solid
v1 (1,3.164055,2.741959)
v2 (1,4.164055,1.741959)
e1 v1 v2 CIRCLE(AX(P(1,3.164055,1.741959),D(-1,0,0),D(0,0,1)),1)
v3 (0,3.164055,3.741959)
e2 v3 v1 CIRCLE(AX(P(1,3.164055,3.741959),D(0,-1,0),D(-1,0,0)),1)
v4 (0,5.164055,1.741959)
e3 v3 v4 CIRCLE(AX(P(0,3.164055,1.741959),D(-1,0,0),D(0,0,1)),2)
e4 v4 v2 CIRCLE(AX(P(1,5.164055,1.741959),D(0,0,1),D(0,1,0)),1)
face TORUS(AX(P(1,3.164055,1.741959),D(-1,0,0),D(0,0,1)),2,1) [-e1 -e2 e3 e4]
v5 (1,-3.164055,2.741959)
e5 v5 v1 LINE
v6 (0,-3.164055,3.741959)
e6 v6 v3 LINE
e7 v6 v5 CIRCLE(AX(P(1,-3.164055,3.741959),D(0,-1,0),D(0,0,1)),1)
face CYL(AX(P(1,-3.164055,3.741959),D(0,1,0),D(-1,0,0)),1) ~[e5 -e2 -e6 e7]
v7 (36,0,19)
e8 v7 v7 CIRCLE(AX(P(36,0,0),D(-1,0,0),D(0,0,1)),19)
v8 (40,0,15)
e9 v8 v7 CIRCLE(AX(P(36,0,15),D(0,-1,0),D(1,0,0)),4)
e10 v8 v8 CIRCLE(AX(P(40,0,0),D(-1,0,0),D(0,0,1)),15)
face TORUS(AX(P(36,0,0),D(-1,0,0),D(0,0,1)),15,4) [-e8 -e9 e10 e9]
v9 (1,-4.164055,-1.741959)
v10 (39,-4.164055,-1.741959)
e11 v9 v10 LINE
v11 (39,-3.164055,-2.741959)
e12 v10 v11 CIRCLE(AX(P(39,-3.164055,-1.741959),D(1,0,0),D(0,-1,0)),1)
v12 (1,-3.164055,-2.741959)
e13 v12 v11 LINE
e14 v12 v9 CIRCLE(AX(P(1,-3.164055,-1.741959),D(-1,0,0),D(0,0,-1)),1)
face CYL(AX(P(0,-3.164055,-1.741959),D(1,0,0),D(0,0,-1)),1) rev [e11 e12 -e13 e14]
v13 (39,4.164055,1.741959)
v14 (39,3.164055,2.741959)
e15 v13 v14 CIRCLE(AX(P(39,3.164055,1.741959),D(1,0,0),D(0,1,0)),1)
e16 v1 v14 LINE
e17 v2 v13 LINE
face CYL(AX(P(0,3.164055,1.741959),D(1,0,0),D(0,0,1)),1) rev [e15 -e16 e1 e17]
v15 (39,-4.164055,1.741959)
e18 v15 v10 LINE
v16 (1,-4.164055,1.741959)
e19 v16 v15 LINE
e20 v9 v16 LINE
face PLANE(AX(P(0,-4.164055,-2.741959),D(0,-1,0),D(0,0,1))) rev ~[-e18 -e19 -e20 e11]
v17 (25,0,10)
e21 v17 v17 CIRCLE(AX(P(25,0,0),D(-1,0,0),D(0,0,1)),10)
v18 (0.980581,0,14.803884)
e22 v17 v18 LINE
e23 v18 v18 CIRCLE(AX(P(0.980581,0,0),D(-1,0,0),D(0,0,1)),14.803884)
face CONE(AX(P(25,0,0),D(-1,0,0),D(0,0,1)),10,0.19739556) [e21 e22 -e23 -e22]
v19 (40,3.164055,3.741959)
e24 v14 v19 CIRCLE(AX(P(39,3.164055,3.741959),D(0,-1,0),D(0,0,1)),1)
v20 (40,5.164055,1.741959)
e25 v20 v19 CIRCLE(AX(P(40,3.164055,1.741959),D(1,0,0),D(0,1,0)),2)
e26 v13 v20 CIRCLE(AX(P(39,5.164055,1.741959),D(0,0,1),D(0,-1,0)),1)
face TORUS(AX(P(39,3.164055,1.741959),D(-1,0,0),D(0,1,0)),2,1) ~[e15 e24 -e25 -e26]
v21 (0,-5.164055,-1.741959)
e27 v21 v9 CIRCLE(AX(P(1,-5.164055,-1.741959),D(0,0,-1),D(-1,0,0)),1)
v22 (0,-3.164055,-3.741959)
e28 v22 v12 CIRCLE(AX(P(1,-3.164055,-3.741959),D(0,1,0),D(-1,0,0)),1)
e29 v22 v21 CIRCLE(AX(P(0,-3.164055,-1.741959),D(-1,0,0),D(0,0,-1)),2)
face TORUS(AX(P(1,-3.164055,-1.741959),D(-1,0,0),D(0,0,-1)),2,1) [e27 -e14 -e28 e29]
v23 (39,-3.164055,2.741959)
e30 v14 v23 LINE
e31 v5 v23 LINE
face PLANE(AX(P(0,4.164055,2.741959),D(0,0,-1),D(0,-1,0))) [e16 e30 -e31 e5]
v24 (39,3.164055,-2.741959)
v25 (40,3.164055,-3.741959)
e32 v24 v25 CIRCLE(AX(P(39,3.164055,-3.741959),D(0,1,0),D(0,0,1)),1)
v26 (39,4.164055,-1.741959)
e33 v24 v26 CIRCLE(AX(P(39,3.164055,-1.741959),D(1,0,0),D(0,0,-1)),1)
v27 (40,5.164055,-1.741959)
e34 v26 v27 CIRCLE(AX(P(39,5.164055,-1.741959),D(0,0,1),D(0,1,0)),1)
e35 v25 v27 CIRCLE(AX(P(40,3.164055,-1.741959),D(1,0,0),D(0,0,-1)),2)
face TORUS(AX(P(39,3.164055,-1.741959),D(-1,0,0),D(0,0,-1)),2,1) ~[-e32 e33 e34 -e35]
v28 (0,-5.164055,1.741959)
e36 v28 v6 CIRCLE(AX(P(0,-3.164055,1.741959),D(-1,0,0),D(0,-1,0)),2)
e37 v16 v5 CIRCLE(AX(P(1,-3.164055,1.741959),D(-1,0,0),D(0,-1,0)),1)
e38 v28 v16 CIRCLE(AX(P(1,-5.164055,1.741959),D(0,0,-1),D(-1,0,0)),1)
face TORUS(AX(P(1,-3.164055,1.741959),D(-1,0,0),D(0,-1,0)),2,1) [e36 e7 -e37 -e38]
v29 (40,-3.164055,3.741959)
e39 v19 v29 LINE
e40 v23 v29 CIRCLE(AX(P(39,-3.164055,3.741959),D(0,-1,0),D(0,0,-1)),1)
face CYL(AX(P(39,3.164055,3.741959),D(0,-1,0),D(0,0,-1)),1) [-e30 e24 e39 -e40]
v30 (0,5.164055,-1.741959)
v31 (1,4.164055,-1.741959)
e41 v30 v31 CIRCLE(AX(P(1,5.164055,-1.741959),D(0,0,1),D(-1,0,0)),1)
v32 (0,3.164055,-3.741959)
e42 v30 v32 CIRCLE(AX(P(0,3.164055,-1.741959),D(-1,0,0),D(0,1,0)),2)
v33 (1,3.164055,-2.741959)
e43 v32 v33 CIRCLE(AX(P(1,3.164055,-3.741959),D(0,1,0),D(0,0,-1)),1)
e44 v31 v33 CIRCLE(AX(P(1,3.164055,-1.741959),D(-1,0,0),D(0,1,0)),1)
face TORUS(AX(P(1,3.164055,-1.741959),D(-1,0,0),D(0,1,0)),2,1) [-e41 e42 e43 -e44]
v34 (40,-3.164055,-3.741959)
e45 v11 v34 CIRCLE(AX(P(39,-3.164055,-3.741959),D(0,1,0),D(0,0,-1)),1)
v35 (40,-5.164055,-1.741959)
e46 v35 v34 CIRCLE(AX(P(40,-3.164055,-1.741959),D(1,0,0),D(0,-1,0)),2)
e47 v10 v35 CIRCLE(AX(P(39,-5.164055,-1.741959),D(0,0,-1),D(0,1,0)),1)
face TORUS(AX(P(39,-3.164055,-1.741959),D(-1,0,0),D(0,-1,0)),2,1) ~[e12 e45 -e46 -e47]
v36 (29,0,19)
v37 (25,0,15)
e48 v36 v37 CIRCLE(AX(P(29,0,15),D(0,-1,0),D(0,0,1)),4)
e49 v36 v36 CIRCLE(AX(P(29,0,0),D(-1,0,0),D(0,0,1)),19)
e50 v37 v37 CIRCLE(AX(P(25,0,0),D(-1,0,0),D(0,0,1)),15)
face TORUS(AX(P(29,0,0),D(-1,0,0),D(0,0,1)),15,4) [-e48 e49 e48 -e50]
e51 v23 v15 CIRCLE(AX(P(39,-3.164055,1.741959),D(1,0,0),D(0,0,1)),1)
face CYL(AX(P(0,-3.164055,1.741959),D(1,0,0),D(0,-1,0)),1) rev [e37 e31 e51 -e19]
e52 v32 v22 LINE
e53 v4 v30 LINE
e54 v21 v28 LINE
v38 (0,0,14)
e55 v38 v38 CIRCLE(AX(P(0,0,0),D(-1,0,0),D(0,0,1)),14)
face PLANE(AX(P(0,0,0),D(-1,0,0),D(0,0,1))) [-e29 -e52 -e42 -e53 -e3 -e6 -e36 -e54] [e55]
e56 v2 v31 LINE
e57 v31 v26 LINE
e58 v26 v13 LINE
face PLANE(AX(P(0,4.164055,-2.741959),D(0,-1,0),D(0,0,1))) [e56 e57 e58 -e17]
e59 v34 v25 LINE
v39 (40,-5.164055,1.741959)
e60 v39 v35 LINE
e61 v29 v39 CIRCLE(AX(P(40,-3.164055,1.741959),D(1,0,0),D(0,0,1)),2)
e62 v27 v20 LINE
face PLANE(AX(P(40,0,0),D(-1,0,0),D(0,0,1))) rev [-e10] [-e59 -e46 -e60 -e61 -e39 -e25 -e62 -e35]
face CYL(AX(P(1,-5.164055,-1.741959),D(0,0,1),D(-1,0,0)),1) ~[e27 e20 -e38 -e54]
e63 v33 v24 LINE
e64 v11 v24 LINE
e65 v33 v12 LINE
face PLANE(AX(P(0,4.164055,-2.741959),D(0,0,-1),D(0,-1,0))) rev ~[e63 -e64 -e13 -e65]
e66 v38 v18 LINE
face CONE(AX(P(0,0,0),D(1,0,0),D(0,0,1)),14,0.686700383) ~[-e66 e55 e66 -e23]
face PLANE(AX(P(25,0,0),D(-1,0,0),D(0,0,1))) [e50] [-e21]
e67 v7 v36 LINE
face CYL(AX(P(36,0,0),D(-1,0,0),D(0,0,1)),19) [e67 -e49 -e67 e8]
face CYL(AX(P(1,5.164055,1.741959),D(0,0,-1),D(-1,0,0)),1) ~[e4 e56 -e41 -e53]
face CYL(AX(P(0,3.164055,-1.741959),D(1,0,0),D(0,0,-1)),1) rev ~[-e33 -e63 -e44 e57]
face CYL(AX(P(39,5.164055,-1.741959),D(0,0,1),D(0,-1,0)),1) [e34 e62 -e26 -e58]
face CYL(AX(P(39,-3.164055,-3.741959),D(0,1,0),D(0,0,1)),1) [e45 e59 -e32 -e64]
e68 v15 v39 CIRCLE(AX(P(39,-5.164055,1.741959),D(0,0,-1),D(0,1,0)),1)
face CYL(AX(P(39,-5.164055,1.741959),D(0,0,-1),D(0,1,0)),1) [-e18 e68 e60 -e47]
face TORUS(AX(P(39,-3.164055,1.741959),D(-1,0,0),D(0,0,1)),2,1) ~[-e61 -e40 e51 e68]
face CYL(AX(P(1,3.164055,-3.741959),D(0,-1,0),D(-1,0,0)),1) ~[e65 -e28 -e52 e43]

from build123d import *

# Parameters (mm, degrees)
F2_W     = 8.328109514
F2_H     = 5.4839188233
F3_DEPTH = 40.001
F4_SIZE  = 1
F5_F1_R  = 1
F5_F2_R  = 1
F5_F3_R  = 1


with BuildPart() as f1:
    # F0 (on Front) → F1 (revolve)
    with BuildSketch(Plane.XZ):
        with BuildLine():
            Line((0, 15), (0, 0))
            Line((0, 0), (40, 0))
            Line((40, 0), (40, 15))
            ThreePointArc((40, 15), (38.8284271247, 17.8284271247), (36, 19))
            Line((36, 19), (29, 19))
            ThreePointArc((29, 19), (26.1715728753, 17.8284271247), (25, 15))
            Line((25, 15), (25, 10))
            Line((25, 10), (0, 15))
        make_face()
    revolve(axis=Axis((20, 0, 0), (-1, 0, 0)))

    # F2 (on face) → F3 (cut, through all)
    with BuildSketch(Plane(origin=(0, 0, 0), x_dir=(0, -1, 0), z_dir=(-1, 0, 0))):
        Rectangle(F2_W, F2_H)
    extrude(amount=-F3_DEPTH, mode=Mode.SUBTRACT)

    # F4
    f4_edges = [f1.edges().sort_by_distance(p)[0] for p in [
        (0, 0, -15),
    ]]
    chamfer(f4_edges, length=F4_SIZE)

    # F5: fillet of radius 1 on 8 edges, made by hand

    # F5_f1
    f5_f1_edges = [f1.edges().sort_by_distance(p)[0] for p in [
        (20, -4.164054757, 2.7419594117),
        (20, -4.164054757, -2.7419594117),
        (20, 4.164054757, 2.7419594117),
        (20, 4.164054757, -2.7419594117),
    ]]
    fillet(f5_f1_edges, radius=F5_F1_R)

    # F5_f2
    f5_f2_edges = [f1.edges().sort_by_distance(p)[0] for p in [
        (0, -4.164054757, 0),
        (0, 4.164054757, 0),
        (0, 3.8711615382, 2.4490661928),
        (0, 3.8711615382, -2.4490661928),
        (0, -3.8711615382, -2.4490661928),
        (0, -3.8711615382, 2.4490661928),
    ]]
    fillet(f5_f2_edges, radius=F5_F2_R)

    # F5_f3
    f5_f3_edges = [f1.edges().sort_by_distance(p)[0] for p in [
        (40, -4.164054757, 0),
        (40, 0, -2.7419594117),
        (40, -3.8711615382, -2.4490661928),
        (40, 3.8711615382, -2.4490661928),
        (40, -3.8711615382, 2.4490661928),
    ]]
    fillet(f5_f3_edges, radius=F5_F3_R)


solid = f1.part
